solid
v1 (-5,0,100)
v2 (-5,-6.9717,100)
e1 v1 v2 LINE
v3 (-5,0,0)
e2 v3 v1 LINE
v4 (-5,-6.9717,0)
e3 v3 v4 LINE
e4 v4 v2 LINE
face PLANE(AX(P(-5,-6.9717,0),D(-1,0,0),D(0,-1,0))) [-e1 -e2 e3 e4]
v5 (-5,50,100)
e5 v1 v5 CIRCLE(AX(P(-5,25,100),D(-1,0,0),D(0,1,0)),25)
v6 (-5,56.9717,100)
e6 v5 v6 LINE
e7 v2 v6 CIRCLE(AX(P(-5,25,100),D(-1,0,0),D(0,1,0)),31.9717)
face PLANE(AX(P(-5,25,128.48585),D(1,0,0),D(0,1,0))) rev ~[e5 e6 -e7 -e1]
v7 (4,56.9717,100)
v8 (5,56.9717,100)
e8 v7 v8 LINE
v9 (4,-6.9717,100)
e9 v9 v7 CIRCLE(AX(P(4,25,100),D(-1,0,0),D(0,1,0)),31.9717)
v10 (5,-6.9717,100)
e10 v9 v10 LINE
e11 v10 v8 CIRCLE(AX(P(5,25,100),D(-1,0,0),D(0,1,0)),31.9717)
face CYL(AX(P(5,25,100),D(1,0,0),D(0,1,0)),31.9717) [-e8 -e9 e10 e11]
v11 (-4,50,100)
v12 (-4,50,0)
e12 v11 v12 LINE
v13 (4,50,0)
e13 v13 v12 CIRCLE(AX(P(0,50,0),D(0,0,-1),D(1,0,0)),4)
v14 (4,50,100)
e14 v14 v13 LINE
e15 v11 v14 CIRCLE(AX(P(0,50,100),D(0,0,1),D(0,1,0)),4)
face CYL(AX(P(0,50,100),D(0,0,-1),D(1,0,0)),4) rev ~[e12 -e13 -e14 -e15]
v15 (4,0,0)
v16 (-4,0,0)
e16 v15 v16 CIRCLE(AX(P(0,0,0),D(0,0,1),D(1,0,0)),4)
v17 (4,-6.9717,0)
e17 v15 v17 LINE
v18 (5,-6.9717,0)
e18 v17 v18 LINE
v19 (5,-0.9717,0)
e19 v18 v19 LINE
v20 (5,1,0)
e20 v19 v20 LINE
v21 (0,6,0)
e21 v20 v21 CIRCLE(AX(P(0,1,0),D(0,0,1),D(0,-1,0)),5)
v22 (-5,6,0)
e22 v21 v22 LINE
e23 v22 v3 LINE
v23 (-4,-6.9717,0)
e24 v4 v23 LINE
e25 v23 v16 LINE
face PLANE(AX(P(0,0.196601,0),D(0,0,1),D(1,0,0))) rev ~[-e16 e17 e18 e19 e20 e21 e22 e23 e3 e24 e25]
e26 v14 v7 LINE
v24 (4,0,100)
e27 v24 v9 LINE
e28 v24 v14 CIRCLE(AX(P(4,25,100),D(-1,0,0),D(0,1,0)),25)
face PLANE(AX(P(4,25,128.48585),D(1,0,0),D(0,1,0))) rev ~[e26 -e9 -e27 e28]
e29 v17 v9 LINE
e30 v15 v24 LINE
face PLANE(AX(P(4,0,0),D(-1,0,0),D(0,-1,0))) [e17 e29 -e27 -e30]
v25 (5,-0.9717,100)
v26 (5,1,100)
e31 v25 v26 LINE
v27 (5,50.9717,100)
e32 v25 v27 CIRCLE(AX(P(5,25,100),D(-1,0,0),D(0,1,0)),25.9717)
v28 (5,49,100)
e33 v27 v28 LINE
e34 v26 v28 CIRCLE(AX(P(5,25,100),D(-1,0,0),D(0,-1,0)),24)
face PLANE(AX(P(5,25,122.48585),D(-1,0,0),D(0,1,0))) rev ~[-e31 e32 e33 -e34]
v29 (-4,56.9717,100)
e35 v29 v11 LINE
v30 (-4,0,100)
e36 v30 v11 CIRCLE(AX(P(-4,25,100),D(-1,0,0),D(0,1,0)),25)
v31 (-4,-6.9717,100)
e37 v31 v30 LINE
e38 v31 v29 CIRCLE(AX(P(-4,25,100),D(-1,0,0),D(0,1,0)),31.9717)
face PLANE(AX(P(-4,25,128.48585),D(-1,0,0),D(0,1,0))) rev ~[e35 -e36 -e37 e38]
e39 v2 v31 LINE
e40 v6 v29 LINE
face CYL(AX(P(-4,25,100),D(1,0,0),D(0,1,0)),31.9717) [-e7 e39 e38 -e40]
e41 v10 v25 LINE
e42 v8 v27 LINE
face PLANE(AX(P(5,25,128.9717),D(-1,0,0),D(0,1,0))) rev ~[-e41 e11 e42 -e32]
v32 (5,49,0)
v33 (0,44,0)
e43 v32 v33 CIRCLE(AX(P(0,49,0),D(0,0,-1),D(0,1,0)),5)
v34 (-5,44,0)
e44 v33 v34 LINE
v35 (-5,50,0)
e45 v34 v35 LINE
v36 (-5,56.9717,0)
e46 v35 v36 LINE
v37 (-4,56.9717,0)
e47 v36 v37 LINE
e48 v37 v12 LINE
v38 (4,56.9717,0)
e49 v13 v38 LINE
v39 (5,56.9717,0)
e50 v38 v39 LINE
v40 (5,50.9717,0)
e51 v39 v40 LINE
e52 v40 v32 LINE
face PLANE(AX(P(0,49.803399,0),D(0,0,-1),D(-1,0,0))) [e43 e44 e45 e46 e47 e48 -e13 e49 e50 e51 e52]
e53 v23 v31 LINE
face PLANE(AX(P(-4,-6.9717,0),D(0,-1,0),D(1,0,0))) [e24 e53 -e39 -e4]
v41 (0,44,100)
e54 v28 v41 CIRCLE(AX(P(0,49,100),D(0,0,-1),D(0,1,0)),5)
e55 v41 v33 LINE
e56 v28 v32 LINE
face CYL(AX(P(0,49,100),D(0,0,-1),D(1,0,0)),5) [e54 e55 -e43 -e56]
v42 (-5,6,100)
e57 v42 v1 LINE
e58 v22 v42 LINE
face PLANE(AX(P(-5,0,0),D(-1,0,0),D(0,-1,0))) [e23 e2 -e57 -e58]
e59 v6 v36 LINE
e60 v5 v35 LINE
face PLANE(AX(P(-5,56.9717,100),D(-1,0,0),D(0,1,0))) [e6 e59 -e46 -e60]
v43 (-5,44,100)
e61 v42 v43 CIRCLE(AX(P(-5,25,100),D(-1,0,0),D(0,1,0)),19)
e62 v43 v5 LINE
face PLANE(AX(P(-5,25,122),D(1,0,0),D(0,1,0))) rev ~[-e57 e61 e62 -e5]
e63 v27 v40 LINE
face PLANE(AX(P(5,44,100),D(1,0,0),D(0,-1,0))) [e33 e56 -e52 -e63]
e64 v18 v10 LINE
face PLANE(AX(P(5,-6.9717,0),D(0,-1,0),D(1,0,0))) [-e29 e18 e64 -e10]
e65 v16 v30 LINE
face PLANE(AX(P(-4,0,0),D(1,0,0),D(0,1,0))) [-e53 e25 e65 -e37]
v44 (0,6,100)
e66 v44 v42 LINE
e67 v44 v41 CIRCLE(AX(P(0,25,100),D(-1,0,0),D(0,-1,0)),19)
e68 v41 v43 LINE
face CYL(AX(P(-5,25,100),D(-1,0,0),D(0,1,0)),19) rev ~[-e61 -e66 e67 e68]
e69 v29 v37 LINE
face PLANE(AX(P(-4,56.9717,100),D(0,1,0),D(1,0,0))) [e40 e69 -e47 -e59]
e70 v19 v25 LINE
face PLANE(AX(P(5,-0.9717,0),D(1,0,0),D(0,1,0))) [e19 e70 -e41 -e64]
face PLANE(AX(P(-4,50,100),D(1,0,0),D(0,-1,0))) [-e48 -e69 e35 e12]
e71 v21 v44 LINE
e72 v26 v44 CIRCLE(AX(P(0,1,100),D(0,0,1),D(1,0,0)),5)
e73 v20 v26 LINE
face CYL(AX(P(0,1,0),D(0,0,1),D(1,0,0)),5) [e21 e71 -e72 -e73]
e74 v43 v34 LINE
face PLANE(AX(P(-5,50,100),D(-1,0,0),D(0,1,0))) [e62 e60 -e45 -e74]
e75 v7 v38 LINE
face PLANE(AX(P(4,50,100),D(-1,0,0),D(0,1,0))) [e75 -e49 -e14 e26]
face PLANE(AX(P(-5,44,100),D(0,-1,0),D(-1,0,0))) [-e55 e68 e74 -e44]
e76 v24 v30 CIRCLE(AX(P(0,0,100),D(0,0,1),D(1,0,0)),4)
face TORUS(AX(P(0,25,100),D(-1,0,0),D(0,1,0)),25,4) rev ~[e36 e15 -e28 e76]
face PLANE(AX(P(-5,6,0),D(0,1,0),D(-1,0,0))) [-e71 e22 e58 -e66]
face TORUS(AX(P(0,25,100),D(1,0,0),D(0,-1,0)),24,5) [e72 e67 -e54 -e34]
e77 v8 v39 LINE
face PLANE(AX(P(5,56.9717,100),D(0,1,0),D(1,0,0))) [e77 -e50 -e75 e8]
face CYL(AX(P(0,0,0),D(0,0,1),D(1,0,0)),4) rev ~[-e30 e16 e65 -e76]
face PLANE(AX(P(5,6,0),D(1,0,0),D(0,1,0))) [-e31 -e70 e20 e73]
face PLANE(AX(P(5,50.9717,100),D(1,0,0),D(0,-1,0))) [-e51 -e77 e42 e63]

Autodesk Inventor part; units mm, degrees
ref_plane "YZ Plane" through (0, 0, 0) normal (1, 0, 0) x (0, 1, 0)
ref_plane "XZ Plane" through (0, 0, 0) normal (0, 1, 0) x (-1, 0, 0)
ref_plane "XY Plane" through (0, 0, 0) normal (0, 0, 1) x (1, 0, 0)
sketch "Sketch3" plane through (0, 0, 0) normal (0, 0, 1) x (1, 0, 0)
  arc A0 (4, 0) -> (-4, 0) centre (0, 0) ccw
  line L0 (5, -0.9717) -> (5, -6.9717)
  line L1 (-5, -6.9717) -> (-5, 0)
  line L2 (-4, 0) -> (-4, -6.9717)
  line L3 (4, 0) -> (4, -6.9717)
  line L4 (5, -6.9717) -> (4, -6.9717)
  line L5 (-4, -6.9717) -> (-5, -6.9717)
  line L6 (-5, 0) -> (-5, 6)
  line L7 (-5, 6) -> (5, 6)
  line L8 (5, 6) -> (5, -0.9717)
  dimension "d9" = 8
  dimension "d11" = 6
  dimension "d29" = 10
  dimension "d30" = 6
sketch "Sketch17" plane through (0, 0, 0) normal (1, 0, 0) x (0, 1, 0)
  line L0 (0, 0) -> (0, 100)
  line L1 (50, 100) -> (50, 0)
  arc A0 (50, 100) -> (0, 100) centre (25, 100) ccw
  dimension "d49" = 100
  dimension "d50" = 50
  dimension "d51" = 50
sweep "Sweep1" add profiles "Sketch3" path "Sketch17"
fillet "Fillet6" radius 5 3 edges at (5, 6, 50) (5, 25, 119) (5, 44, 50)
properties part number "Filament Guide"
